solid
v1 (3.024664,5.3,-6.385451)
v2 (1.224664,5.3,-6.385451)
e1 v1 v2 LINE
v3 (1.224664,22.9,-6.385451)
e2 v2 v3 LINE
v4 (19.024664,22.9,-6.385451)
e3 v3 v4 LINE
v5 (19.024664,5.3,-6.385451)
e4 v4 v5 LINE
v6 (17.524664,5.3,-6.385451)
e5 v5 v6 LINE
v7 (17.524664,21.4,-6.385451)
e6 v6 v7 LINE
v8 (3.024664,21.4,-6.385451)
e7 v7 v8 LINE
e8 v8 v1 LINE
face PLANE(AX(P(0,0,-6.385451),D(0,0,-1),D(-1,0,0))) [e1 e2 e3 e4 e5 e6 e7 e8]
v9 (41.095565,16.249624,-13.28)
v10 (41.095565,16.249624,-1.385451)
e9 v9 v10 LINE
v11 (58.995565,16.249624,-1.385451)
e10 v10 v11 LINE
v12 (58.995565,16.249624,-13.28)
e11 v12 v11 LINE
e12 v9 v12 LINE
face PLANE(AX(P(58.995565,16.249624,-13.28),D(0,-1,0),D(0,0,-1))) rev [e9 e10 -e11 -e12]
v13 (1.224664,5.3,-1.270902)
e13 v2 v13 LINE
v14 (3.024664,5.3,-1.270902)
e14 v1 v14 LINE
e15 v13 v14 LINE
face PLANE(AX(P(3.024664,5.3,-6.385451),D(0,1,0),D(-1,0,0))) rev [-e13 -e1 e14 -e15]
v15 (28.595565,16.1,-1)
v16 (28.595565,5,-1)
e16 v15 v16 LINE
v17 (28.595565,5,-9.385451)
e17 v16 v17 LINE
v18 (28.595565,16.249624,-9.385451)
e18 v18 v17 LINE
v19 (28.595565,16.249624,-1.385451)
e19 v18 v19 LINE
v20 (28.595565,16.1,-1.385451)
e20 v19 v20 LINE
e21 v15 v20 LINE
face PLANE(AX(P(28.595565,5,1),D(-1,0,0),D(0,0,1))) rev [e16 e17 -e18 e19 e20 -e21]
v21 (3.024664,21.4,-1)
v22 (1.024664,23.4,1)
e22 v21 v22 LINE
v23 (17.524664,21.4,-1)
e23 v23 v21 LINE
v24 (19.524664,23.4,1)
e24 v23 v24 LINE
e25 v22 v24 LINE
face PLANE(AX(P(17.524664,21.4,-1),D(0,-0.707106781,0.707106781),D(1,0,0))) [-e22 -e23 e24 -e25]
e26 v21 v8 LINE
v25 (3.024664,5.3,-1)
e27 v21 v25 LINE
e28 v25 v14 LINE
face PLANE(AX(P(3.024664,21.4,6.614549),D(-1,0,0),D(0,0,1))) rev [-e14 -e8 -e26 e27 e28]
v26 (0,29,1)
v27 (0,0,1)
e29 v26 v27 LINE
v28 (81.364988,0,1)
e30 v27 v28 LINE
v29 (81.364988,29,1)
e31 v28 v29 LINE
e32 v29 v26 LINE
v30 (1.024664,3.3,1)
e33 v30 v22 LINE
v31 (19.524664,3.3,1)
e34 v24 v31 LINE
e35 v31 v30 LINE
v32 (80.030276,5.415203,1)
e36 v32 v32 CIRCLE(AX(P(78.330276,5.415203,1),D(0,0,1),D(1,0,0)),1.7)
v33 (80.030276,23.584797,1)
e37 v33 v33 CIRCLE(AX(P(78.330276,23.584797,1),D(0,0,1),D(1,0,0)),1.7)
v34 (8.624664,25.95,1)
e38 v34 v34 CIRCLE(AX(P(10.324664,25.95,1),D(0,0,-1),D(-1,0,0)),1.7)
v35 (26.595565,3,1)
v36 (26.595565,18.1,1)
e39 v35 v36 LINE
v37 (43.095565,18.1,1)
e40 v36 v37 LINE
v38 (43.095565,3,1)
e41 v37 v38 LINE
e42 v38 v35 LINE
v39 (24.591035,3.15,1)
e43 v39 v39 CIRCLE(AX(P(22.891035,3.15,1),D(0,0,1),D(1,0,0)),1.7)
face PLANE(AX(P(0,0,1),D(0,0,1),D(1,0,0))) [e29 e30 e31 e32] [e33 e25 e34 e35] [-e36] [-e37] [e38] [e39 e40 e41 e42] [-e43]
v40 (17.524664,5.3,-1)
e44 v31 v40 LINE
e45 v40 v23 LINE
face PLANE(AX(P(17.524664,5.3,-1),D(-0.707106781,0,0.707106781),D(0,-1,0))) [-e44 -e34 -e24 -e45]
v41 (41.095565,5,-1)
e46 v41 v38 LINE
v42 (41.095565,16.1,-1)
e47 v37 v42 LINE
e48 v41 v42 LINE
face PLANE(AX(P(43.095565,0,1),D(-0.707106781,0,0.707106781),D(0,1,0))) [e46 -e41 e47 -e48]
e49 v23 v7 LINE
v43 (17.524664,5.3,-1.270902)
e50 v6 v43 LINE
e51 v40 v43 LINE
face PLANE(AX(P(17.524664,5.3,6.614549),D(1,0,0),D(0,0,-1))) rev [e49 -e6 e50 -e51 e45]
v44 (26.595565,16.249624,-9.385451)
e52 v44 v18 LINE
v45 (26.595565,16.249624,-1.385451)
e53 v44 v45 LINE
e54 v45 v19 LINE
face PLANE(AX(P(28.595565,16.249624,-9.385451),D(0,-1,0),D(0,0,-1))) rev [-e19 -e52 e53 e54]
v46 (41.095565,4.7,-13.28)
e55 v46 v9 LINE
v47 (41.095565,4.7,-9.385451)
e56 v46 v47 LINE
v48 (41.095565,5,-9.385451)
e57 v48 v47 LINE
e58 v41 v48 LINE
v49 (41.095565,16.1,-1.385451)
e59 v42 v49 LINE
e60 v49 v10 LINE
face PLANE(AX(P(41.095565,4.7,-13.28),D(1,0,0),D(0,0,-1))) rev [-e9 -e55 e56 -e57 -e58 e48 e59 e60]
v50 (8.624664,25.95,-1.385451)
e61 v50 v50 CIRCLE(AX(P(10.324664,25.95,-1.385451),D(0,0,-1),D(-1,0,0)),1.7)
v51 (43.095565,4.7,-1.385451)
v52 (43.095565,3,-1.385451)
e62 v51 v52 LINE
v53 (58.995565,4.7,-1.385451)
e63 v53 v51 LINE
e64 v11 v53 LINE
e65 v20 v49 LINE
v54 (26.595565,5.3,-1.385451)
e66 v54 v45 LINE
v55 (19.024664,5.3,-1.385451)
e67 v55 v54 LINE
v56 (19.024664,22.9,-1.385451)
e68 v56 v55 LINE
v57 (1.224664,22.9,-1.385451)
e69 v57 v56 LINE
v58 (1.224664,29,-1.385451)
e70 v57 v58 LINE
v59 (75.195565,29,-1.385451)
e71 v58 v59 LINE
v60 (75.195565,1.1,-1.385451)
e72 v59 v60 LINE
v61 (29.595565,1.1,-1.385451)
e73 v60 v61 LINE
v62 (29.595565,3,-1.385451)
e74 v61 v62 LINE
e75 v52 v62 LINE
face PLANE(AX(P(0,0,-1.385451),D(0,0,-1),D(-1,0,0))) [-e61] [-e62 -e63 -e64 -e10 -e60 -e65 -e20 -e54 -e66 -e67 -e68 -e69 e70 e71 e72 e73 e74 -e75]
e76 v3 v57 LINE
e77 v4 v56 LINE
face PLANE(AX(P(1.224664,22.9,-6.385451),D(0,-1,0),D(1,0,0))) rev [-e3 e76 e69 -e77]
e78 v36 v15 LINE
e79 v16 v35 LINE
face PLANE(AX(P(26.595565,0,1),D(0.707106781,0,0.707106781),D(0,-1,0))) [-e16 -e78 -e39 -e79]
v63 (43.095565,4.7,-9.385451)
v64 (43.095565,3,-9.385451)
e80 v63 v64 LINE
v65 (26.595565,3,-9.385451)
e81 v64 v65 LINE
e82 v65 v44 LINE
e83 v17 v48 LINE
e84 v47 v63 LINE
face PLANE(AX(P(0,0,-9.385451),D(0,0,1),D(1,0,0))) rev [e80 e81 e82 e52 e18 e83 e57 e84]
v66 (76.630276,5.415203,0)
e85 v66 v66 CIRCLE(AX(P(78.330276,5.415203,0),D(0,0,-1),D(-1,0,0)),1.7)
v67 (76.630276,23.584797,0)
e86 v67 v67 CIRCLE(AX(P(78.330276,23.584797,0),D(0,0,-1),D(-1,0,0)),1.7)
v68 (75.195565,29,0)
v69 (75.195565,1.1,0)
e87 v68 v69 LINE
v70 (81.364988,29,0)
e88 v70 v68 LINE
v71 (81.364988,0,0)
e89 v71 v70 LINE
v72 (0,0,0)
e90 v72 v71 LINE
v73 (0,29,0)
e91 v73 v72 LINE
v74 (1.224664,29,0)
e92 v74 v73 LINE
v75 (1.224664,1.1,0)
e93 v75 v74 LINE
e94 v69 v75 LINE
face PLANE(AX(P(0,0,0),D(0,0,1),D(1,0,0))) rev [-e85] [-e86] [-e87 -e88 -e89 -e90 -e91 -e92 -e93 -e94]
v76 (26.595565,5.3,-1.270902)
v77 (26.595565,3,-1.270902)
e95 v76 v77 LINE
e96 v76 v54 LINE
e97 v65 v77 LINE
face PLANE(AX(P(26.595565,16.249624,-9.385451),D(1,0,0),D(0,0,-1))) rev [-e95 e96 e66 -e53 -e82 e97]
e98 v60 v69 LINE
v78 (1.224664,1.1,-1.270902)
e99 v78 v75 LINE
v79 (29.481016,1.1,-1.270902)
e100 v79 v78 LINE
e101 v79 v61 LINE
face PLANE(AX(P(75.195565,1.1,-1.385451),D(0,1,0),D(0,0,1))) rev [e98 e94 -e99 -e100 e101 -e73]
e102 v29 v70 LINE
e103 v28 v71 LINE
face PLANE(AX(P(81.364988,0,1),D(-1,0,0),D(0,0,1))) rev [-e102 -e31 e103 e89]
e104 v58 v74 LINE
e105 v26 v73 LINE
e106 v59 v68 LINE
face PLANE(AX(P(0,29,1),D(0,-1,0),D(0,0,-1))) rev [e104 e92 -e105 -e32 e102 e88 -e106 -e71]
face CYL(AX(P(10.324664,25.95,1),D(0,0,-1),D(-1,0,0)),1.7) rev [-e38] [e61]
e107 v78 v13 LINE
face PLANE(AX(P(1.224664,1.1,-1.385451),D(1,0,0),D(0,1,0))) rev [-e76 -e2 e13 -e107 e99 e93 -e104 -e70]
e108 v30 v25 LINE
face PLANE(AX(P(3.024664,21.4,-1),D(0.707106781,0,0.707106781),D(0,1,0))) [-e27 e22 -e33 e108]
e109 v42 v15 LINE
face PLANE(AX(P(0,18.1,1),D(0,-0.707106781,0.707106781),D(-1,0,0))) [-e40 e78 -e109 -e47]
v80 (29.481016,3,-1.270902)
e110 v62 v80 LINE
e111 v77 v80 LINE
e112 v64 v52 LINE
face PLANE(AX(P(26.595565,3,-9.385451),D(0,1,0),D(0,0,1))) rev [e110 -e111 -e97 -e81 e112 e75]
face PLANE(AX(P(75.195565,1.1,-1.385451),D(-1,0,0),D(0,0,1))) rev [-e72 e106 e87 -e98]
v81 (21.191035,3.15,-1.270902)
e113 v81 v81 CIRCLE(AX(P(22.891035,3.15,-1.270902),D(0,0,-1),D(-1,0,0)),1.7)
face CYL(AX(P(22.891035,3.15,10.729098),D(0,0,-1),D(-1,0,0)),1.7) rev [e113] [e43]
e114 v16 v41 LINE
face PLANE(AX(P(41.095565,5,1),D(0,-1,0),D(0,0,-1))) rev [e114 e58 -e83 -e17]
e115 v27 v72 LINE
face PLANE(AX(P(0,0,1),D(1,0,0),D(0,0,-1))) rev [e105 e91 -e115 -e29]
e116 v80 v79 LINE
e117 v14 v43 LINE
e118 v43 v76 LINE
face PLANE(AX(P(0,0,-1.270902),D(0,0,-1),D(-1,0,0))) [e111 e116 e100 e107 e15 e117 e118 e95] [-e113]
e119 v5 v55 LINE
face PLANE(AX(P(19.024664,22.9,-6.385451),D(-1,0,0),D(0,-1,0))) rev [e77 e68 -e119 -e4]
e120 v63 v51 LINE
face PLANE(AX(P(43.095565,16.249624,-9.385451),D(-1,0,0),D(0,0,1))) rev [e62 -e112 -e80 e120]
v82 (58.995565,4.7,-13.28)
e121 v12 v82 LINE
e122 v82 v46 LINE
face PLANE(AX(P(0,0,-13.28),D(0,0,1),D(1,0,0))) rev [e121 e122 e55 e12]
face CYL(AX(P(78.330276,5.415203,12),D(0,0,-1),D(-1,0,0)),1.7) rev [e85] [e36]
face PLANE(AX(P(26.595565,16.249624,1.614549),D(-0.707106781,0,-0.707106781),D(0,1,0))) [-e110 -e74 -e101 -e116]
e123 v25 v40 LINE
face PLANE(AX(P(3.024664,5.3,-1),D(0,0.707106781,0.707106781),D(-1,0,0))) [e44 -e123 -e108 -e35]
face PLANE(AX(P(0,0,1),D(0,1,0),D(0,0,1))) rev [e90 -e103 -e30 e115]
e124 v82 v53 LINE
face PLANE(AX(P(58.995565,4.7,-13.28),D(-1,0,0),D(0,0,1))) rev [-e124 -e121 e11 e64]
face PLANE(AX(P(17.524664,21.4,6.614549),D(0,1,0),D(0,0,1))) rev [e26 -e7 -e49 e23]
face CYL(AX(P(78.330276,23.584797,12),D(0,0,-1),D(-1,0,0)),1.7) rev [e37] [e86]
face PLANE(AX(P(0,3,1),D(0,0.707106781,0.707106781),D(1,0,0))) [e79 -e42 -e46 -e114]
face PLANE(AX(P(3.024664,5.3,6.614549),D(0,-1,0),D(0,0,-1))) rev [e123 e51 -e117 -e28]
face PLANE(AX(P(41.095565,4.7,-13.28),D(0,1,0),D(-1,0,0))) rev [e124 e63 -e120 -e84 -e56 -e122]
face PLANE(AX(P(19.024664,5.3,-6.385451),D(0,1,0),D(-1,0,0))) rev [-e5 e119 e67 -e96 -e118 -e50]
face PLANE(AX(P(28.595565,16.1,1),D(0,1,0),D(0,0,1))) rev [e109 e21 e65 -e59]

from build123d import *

# Parameters (mm, degrees)
SKIZZE1_W                       = 81.364988045
SKIZZE1_H                       = 29
AUFSATZ_LINEAR_AUSTRAGEN1_DEPTH = 1
SKIZZE2_W                       = 73.970901255
SKIZZE2_H                       = 27.9
AUFSATZ_LINEAR_AUSTRAGEN2_DEPTH = 1.385451
SKIZZE3_W                       = 17.9
SKIZZE3_H                       = 11.549624398
AUFSATZ_LINEAR_AUSTRAGEN3_DEPTH = 11.894549
SKIZZE4_W                       = 14.5
SKIZZE4_H                       = 16.1
SCHNITT_LINEAR_AUSTRAGEN1_DEPTH = 8
AUFSATZ_LINEAR_AUSTRAGEN4_DEPTH = 5
SKIZZE6_W                       = 12.5
SKIZZE6_H                       = 11.1
SCHNITT_LINEAR_AUSTRAGEN2_DEPTH = 88.193701467
AUFSATZ_LINEAR_AUSTRAGEN5_DEPTH = 8
FASE2_SIZE                      = 2
SKIZZE8_R                       = 1.7
SCHNITT_LINEAR_AUSTRAGEN3_DEPTH = 12
SCHNITT_LINEAR_AUSTRAGEN5_DEPTH = 0.114549
SKIZZE11_R                      = 1.7
SCHNITT_LINEAR_AUSTRAGEN6_DEPTH = 12
FASE3_SIZE                      = 3
SKIZZE12_R                      = 1.7
SCHNITT_LINEAR_AUSTRAGEN7_DEPTH = 88.193701467


with BuildPart() as part:
    # Skizze1 → Aufsatz-Linear austragen1 (new body)
    with BuildSketch(Plane.XY):
        with Locations((40.682494023, 14.5)):
            Rectangle(SKIZZE1_W, SKIZZE1_H)
    extrude(amount=AUFSATZ_LINEAR_AUSTRAGEN1_DEPTH)

    # Skizze2 → Aufsatz-Linear austragen2 (add)
    with BuildSketch(Plane(origin=(0, 0, 0), x_dir=(-1, 0, 0), z_dir=(0, 0, -1))):
        with Locations((-38.210114258, 15.05)):
            Rectangle(SKIZZE2_W, SKIZZE2_H)
    extrude(amount=AUFSATZ_LINEAR_AUSTRAGEN2_DEPTH)

    # Skizze3 → Aufsatz-Linear austragen3 (add)
    with BuildSketch(Plane(origin=(0, 0, -1.385450769), x_dir=(-1, 0, 0), z_dir=(0, 0, -1))):
        with Locations((-50.045564885, 10.474812199)):
            Rectangle(SKIZZE3_W, SKIZZE3_H)
    extrude(amount=AUFSATZ_LINEAR_AUSTRAGEN3_DEPTH)

    # Skizze4 → Schnitt-Linear austragen1 (cut)
    with BuildSketch(Plane(origin=(0, 0, -1.385450769), x_dir=(-1, 0, 0), z_dir=(0, 0, -1))):
        with Locations((-10.27466363, 13.35)):
            Rectangle(SKIZZE4_W, SKIZZE4_H)
    extrude(amount=-SCHNITT_LINEAR_AUSTRAGEN1_DEPTH, mode=Mode.SUBTRACT)

    # Skizze5 → Aufsatz-Linear austragen4 (add)
    with BuildSketch(Plane(origin=(0, 0, -1.385450769), x_dir=(-1, 0, 0), z_dir=(0, 0, -1))):
        Polygon((-19.02466363, 22.9), (-19.02466363, 5.3), (-17.52466363, 5.3), (-17.52466363, 21.4), (-3.02466363, 21.4), (-3.02466363, 5.3), (-1.22466363, 5.3), (-1.22466363, 22.9), align=None)
    extrude(amount=AUFSATZ_LINEAR_AUSTRAGEN4_DEPTH)

    # Skizze6 → Schnitt-Linear austragen2 (cut, through all)
    with BuildSketch(Plane(origin=(0, 0, -1.385450769), x_dir=(-1, 0, 0), z_dir=(0, 0, -1))):
        with Locations((-34.845564885, 10.55)):
            Rectangle(SKIZZE6_W, SKIZZE6_H)
    extrude(amount=-SCHNITT_LINEAR_AUSTRAGEN2_DEPTH, mode=Mode.SUBTRACT)

    # Skizze7 → Aufsatz-Linear austragen5 (add)
    with BuildSketch(Plane(origin=(0, 0, -1.385450769), x_dir=(-1, 0, 0), z_dir=(0, 0, -1))):
        Polygon((-28.595564885, 5), (-28.595564885, 16.249624398), (-26.595564885, 16.249624398), (-26.595564885, 3), (-43.095564885, 3), (-43.095564885, 16.249624398), (-41.095564885, 16.249624398), (-41.095564885, 5), align=None)
    extrude(amount=AUFSATZ_LINEAR_AUSTRAGEN5_DEPTH)

    # Fase2
    fase2_edges = [part.edges().sort_by_distance(p)[0] for p in [
        (10.27466363, 5.3, 1),
        (3.02466363, 13.35, 1),
        (10.27466363, 21.4, 1),
        (17.52466363, 13.35, 1),
        (28.595564885, 10.55, 1),
        (34.845564885, 5, 1),
        (41.095564885, 10.55, 1),
        (34.845564885, 16.1, 1),
    ]]
    chamfer(fase2_edges, length=FASE2_SIZE)

    # Skizze8 → Schnitt-Linear austragen3 (cut)
    with BuildSketch(Plane(origin=(0, 0, 0), x_dir=(-1, 0, 0), z_dir=(0, 0, -1))):
        with Locations((-78.330276465, 23.584796683)):
            Circle(SKIZZE8_R)
        with Locations((-78.330276465, 5.415203317)):
            Circle(SKIZZE8_R)
    extrude(amount=-SCHNITT_LINEAR_AUSTRAGEN3_DEPTH, mode=Mode.SUBTRACT)

    # Skizze10 → Schnitt-Linear austragen5 (cut)
    with BuildSketch(Plane(origin=(0, 0, -1.385450769), x_dir=(-1, 0, 0), z_dir=(0, 0, -1))):
        Polygon((-1.12466363, 5.3), (-26.595564885, 5.3), (-26.595564885, 1.1), (-1.22466363, 1.1), align=None)
    extrude(amount=-SCHNITT_LINEAR_AUSTRAGEN5_DEPTH, mode=Mode.SUBTRACT)

    # Skizze11 → Schnitt-Linear austragen6 (cut)
    with BuildSketch(Plane(origin=(0, 0, -1.270901539), x_dir=(-1, 0, 0), z_dir=(0, 0, -1))):
        with Locations((-22.891035352, 3.15)):
            Circle(SKIZZE11_R)
    extrude(amount=-SCHNITT_LINEAR_AUSTRAGEN6_DEPTH, mode=Mode.SUBTRACT)

    # Fase3
    # the kernel refuses this chamfer: 3 mm, written as the material it takes off along each edge
    with BuildSketch(Plane(origin=(26.595564885, 3, -1.385450769), x_dir=(0.9996219148284762, 0, -0.02749595233212696), z_dir=(0, -1, 0))) as fase3_piece_1_section:
        Polygon((FASE3_SIZE * 0.999621916941, FASE3_SIZE * 0.027495875526), (-FASE3_SIZE * 0.0274959523321, FASE3_SIZE * 0.999621914828), (0, 0), align=None)
    fase3_piece_1 = extrude(amount=9.615048972, mode=Mode.PRIVATE)
    fase3_piece_1 = split(fase3_piece_1, bisect_by=Plane(origin=(29.23101577, 2.05, -1.270901769), z_dir=(0, 0, -1)), keep=Keep.TOP, mode=Mode.PRIVATE)
    add(fase3_piece_1, mode=Mode.SUBTRACT)

    # Skizze12 → Schnitt-Linear austragen7 (cut, through all)
    with BuildSketch(Plane(origin=(0, 0, -1.385450769), x_dir=(-1, 0, 0), z_dir=(0, 0, -1))):
        with Locations((-10.32466363, 25.95)):
            Circle(SKIZZE12_R)
    extrude(amount=-SCHNITT_LINEAR_AUSTRAGEN7_DEPTH, mode=Mode.SUBTRACT)


solid = part.part
